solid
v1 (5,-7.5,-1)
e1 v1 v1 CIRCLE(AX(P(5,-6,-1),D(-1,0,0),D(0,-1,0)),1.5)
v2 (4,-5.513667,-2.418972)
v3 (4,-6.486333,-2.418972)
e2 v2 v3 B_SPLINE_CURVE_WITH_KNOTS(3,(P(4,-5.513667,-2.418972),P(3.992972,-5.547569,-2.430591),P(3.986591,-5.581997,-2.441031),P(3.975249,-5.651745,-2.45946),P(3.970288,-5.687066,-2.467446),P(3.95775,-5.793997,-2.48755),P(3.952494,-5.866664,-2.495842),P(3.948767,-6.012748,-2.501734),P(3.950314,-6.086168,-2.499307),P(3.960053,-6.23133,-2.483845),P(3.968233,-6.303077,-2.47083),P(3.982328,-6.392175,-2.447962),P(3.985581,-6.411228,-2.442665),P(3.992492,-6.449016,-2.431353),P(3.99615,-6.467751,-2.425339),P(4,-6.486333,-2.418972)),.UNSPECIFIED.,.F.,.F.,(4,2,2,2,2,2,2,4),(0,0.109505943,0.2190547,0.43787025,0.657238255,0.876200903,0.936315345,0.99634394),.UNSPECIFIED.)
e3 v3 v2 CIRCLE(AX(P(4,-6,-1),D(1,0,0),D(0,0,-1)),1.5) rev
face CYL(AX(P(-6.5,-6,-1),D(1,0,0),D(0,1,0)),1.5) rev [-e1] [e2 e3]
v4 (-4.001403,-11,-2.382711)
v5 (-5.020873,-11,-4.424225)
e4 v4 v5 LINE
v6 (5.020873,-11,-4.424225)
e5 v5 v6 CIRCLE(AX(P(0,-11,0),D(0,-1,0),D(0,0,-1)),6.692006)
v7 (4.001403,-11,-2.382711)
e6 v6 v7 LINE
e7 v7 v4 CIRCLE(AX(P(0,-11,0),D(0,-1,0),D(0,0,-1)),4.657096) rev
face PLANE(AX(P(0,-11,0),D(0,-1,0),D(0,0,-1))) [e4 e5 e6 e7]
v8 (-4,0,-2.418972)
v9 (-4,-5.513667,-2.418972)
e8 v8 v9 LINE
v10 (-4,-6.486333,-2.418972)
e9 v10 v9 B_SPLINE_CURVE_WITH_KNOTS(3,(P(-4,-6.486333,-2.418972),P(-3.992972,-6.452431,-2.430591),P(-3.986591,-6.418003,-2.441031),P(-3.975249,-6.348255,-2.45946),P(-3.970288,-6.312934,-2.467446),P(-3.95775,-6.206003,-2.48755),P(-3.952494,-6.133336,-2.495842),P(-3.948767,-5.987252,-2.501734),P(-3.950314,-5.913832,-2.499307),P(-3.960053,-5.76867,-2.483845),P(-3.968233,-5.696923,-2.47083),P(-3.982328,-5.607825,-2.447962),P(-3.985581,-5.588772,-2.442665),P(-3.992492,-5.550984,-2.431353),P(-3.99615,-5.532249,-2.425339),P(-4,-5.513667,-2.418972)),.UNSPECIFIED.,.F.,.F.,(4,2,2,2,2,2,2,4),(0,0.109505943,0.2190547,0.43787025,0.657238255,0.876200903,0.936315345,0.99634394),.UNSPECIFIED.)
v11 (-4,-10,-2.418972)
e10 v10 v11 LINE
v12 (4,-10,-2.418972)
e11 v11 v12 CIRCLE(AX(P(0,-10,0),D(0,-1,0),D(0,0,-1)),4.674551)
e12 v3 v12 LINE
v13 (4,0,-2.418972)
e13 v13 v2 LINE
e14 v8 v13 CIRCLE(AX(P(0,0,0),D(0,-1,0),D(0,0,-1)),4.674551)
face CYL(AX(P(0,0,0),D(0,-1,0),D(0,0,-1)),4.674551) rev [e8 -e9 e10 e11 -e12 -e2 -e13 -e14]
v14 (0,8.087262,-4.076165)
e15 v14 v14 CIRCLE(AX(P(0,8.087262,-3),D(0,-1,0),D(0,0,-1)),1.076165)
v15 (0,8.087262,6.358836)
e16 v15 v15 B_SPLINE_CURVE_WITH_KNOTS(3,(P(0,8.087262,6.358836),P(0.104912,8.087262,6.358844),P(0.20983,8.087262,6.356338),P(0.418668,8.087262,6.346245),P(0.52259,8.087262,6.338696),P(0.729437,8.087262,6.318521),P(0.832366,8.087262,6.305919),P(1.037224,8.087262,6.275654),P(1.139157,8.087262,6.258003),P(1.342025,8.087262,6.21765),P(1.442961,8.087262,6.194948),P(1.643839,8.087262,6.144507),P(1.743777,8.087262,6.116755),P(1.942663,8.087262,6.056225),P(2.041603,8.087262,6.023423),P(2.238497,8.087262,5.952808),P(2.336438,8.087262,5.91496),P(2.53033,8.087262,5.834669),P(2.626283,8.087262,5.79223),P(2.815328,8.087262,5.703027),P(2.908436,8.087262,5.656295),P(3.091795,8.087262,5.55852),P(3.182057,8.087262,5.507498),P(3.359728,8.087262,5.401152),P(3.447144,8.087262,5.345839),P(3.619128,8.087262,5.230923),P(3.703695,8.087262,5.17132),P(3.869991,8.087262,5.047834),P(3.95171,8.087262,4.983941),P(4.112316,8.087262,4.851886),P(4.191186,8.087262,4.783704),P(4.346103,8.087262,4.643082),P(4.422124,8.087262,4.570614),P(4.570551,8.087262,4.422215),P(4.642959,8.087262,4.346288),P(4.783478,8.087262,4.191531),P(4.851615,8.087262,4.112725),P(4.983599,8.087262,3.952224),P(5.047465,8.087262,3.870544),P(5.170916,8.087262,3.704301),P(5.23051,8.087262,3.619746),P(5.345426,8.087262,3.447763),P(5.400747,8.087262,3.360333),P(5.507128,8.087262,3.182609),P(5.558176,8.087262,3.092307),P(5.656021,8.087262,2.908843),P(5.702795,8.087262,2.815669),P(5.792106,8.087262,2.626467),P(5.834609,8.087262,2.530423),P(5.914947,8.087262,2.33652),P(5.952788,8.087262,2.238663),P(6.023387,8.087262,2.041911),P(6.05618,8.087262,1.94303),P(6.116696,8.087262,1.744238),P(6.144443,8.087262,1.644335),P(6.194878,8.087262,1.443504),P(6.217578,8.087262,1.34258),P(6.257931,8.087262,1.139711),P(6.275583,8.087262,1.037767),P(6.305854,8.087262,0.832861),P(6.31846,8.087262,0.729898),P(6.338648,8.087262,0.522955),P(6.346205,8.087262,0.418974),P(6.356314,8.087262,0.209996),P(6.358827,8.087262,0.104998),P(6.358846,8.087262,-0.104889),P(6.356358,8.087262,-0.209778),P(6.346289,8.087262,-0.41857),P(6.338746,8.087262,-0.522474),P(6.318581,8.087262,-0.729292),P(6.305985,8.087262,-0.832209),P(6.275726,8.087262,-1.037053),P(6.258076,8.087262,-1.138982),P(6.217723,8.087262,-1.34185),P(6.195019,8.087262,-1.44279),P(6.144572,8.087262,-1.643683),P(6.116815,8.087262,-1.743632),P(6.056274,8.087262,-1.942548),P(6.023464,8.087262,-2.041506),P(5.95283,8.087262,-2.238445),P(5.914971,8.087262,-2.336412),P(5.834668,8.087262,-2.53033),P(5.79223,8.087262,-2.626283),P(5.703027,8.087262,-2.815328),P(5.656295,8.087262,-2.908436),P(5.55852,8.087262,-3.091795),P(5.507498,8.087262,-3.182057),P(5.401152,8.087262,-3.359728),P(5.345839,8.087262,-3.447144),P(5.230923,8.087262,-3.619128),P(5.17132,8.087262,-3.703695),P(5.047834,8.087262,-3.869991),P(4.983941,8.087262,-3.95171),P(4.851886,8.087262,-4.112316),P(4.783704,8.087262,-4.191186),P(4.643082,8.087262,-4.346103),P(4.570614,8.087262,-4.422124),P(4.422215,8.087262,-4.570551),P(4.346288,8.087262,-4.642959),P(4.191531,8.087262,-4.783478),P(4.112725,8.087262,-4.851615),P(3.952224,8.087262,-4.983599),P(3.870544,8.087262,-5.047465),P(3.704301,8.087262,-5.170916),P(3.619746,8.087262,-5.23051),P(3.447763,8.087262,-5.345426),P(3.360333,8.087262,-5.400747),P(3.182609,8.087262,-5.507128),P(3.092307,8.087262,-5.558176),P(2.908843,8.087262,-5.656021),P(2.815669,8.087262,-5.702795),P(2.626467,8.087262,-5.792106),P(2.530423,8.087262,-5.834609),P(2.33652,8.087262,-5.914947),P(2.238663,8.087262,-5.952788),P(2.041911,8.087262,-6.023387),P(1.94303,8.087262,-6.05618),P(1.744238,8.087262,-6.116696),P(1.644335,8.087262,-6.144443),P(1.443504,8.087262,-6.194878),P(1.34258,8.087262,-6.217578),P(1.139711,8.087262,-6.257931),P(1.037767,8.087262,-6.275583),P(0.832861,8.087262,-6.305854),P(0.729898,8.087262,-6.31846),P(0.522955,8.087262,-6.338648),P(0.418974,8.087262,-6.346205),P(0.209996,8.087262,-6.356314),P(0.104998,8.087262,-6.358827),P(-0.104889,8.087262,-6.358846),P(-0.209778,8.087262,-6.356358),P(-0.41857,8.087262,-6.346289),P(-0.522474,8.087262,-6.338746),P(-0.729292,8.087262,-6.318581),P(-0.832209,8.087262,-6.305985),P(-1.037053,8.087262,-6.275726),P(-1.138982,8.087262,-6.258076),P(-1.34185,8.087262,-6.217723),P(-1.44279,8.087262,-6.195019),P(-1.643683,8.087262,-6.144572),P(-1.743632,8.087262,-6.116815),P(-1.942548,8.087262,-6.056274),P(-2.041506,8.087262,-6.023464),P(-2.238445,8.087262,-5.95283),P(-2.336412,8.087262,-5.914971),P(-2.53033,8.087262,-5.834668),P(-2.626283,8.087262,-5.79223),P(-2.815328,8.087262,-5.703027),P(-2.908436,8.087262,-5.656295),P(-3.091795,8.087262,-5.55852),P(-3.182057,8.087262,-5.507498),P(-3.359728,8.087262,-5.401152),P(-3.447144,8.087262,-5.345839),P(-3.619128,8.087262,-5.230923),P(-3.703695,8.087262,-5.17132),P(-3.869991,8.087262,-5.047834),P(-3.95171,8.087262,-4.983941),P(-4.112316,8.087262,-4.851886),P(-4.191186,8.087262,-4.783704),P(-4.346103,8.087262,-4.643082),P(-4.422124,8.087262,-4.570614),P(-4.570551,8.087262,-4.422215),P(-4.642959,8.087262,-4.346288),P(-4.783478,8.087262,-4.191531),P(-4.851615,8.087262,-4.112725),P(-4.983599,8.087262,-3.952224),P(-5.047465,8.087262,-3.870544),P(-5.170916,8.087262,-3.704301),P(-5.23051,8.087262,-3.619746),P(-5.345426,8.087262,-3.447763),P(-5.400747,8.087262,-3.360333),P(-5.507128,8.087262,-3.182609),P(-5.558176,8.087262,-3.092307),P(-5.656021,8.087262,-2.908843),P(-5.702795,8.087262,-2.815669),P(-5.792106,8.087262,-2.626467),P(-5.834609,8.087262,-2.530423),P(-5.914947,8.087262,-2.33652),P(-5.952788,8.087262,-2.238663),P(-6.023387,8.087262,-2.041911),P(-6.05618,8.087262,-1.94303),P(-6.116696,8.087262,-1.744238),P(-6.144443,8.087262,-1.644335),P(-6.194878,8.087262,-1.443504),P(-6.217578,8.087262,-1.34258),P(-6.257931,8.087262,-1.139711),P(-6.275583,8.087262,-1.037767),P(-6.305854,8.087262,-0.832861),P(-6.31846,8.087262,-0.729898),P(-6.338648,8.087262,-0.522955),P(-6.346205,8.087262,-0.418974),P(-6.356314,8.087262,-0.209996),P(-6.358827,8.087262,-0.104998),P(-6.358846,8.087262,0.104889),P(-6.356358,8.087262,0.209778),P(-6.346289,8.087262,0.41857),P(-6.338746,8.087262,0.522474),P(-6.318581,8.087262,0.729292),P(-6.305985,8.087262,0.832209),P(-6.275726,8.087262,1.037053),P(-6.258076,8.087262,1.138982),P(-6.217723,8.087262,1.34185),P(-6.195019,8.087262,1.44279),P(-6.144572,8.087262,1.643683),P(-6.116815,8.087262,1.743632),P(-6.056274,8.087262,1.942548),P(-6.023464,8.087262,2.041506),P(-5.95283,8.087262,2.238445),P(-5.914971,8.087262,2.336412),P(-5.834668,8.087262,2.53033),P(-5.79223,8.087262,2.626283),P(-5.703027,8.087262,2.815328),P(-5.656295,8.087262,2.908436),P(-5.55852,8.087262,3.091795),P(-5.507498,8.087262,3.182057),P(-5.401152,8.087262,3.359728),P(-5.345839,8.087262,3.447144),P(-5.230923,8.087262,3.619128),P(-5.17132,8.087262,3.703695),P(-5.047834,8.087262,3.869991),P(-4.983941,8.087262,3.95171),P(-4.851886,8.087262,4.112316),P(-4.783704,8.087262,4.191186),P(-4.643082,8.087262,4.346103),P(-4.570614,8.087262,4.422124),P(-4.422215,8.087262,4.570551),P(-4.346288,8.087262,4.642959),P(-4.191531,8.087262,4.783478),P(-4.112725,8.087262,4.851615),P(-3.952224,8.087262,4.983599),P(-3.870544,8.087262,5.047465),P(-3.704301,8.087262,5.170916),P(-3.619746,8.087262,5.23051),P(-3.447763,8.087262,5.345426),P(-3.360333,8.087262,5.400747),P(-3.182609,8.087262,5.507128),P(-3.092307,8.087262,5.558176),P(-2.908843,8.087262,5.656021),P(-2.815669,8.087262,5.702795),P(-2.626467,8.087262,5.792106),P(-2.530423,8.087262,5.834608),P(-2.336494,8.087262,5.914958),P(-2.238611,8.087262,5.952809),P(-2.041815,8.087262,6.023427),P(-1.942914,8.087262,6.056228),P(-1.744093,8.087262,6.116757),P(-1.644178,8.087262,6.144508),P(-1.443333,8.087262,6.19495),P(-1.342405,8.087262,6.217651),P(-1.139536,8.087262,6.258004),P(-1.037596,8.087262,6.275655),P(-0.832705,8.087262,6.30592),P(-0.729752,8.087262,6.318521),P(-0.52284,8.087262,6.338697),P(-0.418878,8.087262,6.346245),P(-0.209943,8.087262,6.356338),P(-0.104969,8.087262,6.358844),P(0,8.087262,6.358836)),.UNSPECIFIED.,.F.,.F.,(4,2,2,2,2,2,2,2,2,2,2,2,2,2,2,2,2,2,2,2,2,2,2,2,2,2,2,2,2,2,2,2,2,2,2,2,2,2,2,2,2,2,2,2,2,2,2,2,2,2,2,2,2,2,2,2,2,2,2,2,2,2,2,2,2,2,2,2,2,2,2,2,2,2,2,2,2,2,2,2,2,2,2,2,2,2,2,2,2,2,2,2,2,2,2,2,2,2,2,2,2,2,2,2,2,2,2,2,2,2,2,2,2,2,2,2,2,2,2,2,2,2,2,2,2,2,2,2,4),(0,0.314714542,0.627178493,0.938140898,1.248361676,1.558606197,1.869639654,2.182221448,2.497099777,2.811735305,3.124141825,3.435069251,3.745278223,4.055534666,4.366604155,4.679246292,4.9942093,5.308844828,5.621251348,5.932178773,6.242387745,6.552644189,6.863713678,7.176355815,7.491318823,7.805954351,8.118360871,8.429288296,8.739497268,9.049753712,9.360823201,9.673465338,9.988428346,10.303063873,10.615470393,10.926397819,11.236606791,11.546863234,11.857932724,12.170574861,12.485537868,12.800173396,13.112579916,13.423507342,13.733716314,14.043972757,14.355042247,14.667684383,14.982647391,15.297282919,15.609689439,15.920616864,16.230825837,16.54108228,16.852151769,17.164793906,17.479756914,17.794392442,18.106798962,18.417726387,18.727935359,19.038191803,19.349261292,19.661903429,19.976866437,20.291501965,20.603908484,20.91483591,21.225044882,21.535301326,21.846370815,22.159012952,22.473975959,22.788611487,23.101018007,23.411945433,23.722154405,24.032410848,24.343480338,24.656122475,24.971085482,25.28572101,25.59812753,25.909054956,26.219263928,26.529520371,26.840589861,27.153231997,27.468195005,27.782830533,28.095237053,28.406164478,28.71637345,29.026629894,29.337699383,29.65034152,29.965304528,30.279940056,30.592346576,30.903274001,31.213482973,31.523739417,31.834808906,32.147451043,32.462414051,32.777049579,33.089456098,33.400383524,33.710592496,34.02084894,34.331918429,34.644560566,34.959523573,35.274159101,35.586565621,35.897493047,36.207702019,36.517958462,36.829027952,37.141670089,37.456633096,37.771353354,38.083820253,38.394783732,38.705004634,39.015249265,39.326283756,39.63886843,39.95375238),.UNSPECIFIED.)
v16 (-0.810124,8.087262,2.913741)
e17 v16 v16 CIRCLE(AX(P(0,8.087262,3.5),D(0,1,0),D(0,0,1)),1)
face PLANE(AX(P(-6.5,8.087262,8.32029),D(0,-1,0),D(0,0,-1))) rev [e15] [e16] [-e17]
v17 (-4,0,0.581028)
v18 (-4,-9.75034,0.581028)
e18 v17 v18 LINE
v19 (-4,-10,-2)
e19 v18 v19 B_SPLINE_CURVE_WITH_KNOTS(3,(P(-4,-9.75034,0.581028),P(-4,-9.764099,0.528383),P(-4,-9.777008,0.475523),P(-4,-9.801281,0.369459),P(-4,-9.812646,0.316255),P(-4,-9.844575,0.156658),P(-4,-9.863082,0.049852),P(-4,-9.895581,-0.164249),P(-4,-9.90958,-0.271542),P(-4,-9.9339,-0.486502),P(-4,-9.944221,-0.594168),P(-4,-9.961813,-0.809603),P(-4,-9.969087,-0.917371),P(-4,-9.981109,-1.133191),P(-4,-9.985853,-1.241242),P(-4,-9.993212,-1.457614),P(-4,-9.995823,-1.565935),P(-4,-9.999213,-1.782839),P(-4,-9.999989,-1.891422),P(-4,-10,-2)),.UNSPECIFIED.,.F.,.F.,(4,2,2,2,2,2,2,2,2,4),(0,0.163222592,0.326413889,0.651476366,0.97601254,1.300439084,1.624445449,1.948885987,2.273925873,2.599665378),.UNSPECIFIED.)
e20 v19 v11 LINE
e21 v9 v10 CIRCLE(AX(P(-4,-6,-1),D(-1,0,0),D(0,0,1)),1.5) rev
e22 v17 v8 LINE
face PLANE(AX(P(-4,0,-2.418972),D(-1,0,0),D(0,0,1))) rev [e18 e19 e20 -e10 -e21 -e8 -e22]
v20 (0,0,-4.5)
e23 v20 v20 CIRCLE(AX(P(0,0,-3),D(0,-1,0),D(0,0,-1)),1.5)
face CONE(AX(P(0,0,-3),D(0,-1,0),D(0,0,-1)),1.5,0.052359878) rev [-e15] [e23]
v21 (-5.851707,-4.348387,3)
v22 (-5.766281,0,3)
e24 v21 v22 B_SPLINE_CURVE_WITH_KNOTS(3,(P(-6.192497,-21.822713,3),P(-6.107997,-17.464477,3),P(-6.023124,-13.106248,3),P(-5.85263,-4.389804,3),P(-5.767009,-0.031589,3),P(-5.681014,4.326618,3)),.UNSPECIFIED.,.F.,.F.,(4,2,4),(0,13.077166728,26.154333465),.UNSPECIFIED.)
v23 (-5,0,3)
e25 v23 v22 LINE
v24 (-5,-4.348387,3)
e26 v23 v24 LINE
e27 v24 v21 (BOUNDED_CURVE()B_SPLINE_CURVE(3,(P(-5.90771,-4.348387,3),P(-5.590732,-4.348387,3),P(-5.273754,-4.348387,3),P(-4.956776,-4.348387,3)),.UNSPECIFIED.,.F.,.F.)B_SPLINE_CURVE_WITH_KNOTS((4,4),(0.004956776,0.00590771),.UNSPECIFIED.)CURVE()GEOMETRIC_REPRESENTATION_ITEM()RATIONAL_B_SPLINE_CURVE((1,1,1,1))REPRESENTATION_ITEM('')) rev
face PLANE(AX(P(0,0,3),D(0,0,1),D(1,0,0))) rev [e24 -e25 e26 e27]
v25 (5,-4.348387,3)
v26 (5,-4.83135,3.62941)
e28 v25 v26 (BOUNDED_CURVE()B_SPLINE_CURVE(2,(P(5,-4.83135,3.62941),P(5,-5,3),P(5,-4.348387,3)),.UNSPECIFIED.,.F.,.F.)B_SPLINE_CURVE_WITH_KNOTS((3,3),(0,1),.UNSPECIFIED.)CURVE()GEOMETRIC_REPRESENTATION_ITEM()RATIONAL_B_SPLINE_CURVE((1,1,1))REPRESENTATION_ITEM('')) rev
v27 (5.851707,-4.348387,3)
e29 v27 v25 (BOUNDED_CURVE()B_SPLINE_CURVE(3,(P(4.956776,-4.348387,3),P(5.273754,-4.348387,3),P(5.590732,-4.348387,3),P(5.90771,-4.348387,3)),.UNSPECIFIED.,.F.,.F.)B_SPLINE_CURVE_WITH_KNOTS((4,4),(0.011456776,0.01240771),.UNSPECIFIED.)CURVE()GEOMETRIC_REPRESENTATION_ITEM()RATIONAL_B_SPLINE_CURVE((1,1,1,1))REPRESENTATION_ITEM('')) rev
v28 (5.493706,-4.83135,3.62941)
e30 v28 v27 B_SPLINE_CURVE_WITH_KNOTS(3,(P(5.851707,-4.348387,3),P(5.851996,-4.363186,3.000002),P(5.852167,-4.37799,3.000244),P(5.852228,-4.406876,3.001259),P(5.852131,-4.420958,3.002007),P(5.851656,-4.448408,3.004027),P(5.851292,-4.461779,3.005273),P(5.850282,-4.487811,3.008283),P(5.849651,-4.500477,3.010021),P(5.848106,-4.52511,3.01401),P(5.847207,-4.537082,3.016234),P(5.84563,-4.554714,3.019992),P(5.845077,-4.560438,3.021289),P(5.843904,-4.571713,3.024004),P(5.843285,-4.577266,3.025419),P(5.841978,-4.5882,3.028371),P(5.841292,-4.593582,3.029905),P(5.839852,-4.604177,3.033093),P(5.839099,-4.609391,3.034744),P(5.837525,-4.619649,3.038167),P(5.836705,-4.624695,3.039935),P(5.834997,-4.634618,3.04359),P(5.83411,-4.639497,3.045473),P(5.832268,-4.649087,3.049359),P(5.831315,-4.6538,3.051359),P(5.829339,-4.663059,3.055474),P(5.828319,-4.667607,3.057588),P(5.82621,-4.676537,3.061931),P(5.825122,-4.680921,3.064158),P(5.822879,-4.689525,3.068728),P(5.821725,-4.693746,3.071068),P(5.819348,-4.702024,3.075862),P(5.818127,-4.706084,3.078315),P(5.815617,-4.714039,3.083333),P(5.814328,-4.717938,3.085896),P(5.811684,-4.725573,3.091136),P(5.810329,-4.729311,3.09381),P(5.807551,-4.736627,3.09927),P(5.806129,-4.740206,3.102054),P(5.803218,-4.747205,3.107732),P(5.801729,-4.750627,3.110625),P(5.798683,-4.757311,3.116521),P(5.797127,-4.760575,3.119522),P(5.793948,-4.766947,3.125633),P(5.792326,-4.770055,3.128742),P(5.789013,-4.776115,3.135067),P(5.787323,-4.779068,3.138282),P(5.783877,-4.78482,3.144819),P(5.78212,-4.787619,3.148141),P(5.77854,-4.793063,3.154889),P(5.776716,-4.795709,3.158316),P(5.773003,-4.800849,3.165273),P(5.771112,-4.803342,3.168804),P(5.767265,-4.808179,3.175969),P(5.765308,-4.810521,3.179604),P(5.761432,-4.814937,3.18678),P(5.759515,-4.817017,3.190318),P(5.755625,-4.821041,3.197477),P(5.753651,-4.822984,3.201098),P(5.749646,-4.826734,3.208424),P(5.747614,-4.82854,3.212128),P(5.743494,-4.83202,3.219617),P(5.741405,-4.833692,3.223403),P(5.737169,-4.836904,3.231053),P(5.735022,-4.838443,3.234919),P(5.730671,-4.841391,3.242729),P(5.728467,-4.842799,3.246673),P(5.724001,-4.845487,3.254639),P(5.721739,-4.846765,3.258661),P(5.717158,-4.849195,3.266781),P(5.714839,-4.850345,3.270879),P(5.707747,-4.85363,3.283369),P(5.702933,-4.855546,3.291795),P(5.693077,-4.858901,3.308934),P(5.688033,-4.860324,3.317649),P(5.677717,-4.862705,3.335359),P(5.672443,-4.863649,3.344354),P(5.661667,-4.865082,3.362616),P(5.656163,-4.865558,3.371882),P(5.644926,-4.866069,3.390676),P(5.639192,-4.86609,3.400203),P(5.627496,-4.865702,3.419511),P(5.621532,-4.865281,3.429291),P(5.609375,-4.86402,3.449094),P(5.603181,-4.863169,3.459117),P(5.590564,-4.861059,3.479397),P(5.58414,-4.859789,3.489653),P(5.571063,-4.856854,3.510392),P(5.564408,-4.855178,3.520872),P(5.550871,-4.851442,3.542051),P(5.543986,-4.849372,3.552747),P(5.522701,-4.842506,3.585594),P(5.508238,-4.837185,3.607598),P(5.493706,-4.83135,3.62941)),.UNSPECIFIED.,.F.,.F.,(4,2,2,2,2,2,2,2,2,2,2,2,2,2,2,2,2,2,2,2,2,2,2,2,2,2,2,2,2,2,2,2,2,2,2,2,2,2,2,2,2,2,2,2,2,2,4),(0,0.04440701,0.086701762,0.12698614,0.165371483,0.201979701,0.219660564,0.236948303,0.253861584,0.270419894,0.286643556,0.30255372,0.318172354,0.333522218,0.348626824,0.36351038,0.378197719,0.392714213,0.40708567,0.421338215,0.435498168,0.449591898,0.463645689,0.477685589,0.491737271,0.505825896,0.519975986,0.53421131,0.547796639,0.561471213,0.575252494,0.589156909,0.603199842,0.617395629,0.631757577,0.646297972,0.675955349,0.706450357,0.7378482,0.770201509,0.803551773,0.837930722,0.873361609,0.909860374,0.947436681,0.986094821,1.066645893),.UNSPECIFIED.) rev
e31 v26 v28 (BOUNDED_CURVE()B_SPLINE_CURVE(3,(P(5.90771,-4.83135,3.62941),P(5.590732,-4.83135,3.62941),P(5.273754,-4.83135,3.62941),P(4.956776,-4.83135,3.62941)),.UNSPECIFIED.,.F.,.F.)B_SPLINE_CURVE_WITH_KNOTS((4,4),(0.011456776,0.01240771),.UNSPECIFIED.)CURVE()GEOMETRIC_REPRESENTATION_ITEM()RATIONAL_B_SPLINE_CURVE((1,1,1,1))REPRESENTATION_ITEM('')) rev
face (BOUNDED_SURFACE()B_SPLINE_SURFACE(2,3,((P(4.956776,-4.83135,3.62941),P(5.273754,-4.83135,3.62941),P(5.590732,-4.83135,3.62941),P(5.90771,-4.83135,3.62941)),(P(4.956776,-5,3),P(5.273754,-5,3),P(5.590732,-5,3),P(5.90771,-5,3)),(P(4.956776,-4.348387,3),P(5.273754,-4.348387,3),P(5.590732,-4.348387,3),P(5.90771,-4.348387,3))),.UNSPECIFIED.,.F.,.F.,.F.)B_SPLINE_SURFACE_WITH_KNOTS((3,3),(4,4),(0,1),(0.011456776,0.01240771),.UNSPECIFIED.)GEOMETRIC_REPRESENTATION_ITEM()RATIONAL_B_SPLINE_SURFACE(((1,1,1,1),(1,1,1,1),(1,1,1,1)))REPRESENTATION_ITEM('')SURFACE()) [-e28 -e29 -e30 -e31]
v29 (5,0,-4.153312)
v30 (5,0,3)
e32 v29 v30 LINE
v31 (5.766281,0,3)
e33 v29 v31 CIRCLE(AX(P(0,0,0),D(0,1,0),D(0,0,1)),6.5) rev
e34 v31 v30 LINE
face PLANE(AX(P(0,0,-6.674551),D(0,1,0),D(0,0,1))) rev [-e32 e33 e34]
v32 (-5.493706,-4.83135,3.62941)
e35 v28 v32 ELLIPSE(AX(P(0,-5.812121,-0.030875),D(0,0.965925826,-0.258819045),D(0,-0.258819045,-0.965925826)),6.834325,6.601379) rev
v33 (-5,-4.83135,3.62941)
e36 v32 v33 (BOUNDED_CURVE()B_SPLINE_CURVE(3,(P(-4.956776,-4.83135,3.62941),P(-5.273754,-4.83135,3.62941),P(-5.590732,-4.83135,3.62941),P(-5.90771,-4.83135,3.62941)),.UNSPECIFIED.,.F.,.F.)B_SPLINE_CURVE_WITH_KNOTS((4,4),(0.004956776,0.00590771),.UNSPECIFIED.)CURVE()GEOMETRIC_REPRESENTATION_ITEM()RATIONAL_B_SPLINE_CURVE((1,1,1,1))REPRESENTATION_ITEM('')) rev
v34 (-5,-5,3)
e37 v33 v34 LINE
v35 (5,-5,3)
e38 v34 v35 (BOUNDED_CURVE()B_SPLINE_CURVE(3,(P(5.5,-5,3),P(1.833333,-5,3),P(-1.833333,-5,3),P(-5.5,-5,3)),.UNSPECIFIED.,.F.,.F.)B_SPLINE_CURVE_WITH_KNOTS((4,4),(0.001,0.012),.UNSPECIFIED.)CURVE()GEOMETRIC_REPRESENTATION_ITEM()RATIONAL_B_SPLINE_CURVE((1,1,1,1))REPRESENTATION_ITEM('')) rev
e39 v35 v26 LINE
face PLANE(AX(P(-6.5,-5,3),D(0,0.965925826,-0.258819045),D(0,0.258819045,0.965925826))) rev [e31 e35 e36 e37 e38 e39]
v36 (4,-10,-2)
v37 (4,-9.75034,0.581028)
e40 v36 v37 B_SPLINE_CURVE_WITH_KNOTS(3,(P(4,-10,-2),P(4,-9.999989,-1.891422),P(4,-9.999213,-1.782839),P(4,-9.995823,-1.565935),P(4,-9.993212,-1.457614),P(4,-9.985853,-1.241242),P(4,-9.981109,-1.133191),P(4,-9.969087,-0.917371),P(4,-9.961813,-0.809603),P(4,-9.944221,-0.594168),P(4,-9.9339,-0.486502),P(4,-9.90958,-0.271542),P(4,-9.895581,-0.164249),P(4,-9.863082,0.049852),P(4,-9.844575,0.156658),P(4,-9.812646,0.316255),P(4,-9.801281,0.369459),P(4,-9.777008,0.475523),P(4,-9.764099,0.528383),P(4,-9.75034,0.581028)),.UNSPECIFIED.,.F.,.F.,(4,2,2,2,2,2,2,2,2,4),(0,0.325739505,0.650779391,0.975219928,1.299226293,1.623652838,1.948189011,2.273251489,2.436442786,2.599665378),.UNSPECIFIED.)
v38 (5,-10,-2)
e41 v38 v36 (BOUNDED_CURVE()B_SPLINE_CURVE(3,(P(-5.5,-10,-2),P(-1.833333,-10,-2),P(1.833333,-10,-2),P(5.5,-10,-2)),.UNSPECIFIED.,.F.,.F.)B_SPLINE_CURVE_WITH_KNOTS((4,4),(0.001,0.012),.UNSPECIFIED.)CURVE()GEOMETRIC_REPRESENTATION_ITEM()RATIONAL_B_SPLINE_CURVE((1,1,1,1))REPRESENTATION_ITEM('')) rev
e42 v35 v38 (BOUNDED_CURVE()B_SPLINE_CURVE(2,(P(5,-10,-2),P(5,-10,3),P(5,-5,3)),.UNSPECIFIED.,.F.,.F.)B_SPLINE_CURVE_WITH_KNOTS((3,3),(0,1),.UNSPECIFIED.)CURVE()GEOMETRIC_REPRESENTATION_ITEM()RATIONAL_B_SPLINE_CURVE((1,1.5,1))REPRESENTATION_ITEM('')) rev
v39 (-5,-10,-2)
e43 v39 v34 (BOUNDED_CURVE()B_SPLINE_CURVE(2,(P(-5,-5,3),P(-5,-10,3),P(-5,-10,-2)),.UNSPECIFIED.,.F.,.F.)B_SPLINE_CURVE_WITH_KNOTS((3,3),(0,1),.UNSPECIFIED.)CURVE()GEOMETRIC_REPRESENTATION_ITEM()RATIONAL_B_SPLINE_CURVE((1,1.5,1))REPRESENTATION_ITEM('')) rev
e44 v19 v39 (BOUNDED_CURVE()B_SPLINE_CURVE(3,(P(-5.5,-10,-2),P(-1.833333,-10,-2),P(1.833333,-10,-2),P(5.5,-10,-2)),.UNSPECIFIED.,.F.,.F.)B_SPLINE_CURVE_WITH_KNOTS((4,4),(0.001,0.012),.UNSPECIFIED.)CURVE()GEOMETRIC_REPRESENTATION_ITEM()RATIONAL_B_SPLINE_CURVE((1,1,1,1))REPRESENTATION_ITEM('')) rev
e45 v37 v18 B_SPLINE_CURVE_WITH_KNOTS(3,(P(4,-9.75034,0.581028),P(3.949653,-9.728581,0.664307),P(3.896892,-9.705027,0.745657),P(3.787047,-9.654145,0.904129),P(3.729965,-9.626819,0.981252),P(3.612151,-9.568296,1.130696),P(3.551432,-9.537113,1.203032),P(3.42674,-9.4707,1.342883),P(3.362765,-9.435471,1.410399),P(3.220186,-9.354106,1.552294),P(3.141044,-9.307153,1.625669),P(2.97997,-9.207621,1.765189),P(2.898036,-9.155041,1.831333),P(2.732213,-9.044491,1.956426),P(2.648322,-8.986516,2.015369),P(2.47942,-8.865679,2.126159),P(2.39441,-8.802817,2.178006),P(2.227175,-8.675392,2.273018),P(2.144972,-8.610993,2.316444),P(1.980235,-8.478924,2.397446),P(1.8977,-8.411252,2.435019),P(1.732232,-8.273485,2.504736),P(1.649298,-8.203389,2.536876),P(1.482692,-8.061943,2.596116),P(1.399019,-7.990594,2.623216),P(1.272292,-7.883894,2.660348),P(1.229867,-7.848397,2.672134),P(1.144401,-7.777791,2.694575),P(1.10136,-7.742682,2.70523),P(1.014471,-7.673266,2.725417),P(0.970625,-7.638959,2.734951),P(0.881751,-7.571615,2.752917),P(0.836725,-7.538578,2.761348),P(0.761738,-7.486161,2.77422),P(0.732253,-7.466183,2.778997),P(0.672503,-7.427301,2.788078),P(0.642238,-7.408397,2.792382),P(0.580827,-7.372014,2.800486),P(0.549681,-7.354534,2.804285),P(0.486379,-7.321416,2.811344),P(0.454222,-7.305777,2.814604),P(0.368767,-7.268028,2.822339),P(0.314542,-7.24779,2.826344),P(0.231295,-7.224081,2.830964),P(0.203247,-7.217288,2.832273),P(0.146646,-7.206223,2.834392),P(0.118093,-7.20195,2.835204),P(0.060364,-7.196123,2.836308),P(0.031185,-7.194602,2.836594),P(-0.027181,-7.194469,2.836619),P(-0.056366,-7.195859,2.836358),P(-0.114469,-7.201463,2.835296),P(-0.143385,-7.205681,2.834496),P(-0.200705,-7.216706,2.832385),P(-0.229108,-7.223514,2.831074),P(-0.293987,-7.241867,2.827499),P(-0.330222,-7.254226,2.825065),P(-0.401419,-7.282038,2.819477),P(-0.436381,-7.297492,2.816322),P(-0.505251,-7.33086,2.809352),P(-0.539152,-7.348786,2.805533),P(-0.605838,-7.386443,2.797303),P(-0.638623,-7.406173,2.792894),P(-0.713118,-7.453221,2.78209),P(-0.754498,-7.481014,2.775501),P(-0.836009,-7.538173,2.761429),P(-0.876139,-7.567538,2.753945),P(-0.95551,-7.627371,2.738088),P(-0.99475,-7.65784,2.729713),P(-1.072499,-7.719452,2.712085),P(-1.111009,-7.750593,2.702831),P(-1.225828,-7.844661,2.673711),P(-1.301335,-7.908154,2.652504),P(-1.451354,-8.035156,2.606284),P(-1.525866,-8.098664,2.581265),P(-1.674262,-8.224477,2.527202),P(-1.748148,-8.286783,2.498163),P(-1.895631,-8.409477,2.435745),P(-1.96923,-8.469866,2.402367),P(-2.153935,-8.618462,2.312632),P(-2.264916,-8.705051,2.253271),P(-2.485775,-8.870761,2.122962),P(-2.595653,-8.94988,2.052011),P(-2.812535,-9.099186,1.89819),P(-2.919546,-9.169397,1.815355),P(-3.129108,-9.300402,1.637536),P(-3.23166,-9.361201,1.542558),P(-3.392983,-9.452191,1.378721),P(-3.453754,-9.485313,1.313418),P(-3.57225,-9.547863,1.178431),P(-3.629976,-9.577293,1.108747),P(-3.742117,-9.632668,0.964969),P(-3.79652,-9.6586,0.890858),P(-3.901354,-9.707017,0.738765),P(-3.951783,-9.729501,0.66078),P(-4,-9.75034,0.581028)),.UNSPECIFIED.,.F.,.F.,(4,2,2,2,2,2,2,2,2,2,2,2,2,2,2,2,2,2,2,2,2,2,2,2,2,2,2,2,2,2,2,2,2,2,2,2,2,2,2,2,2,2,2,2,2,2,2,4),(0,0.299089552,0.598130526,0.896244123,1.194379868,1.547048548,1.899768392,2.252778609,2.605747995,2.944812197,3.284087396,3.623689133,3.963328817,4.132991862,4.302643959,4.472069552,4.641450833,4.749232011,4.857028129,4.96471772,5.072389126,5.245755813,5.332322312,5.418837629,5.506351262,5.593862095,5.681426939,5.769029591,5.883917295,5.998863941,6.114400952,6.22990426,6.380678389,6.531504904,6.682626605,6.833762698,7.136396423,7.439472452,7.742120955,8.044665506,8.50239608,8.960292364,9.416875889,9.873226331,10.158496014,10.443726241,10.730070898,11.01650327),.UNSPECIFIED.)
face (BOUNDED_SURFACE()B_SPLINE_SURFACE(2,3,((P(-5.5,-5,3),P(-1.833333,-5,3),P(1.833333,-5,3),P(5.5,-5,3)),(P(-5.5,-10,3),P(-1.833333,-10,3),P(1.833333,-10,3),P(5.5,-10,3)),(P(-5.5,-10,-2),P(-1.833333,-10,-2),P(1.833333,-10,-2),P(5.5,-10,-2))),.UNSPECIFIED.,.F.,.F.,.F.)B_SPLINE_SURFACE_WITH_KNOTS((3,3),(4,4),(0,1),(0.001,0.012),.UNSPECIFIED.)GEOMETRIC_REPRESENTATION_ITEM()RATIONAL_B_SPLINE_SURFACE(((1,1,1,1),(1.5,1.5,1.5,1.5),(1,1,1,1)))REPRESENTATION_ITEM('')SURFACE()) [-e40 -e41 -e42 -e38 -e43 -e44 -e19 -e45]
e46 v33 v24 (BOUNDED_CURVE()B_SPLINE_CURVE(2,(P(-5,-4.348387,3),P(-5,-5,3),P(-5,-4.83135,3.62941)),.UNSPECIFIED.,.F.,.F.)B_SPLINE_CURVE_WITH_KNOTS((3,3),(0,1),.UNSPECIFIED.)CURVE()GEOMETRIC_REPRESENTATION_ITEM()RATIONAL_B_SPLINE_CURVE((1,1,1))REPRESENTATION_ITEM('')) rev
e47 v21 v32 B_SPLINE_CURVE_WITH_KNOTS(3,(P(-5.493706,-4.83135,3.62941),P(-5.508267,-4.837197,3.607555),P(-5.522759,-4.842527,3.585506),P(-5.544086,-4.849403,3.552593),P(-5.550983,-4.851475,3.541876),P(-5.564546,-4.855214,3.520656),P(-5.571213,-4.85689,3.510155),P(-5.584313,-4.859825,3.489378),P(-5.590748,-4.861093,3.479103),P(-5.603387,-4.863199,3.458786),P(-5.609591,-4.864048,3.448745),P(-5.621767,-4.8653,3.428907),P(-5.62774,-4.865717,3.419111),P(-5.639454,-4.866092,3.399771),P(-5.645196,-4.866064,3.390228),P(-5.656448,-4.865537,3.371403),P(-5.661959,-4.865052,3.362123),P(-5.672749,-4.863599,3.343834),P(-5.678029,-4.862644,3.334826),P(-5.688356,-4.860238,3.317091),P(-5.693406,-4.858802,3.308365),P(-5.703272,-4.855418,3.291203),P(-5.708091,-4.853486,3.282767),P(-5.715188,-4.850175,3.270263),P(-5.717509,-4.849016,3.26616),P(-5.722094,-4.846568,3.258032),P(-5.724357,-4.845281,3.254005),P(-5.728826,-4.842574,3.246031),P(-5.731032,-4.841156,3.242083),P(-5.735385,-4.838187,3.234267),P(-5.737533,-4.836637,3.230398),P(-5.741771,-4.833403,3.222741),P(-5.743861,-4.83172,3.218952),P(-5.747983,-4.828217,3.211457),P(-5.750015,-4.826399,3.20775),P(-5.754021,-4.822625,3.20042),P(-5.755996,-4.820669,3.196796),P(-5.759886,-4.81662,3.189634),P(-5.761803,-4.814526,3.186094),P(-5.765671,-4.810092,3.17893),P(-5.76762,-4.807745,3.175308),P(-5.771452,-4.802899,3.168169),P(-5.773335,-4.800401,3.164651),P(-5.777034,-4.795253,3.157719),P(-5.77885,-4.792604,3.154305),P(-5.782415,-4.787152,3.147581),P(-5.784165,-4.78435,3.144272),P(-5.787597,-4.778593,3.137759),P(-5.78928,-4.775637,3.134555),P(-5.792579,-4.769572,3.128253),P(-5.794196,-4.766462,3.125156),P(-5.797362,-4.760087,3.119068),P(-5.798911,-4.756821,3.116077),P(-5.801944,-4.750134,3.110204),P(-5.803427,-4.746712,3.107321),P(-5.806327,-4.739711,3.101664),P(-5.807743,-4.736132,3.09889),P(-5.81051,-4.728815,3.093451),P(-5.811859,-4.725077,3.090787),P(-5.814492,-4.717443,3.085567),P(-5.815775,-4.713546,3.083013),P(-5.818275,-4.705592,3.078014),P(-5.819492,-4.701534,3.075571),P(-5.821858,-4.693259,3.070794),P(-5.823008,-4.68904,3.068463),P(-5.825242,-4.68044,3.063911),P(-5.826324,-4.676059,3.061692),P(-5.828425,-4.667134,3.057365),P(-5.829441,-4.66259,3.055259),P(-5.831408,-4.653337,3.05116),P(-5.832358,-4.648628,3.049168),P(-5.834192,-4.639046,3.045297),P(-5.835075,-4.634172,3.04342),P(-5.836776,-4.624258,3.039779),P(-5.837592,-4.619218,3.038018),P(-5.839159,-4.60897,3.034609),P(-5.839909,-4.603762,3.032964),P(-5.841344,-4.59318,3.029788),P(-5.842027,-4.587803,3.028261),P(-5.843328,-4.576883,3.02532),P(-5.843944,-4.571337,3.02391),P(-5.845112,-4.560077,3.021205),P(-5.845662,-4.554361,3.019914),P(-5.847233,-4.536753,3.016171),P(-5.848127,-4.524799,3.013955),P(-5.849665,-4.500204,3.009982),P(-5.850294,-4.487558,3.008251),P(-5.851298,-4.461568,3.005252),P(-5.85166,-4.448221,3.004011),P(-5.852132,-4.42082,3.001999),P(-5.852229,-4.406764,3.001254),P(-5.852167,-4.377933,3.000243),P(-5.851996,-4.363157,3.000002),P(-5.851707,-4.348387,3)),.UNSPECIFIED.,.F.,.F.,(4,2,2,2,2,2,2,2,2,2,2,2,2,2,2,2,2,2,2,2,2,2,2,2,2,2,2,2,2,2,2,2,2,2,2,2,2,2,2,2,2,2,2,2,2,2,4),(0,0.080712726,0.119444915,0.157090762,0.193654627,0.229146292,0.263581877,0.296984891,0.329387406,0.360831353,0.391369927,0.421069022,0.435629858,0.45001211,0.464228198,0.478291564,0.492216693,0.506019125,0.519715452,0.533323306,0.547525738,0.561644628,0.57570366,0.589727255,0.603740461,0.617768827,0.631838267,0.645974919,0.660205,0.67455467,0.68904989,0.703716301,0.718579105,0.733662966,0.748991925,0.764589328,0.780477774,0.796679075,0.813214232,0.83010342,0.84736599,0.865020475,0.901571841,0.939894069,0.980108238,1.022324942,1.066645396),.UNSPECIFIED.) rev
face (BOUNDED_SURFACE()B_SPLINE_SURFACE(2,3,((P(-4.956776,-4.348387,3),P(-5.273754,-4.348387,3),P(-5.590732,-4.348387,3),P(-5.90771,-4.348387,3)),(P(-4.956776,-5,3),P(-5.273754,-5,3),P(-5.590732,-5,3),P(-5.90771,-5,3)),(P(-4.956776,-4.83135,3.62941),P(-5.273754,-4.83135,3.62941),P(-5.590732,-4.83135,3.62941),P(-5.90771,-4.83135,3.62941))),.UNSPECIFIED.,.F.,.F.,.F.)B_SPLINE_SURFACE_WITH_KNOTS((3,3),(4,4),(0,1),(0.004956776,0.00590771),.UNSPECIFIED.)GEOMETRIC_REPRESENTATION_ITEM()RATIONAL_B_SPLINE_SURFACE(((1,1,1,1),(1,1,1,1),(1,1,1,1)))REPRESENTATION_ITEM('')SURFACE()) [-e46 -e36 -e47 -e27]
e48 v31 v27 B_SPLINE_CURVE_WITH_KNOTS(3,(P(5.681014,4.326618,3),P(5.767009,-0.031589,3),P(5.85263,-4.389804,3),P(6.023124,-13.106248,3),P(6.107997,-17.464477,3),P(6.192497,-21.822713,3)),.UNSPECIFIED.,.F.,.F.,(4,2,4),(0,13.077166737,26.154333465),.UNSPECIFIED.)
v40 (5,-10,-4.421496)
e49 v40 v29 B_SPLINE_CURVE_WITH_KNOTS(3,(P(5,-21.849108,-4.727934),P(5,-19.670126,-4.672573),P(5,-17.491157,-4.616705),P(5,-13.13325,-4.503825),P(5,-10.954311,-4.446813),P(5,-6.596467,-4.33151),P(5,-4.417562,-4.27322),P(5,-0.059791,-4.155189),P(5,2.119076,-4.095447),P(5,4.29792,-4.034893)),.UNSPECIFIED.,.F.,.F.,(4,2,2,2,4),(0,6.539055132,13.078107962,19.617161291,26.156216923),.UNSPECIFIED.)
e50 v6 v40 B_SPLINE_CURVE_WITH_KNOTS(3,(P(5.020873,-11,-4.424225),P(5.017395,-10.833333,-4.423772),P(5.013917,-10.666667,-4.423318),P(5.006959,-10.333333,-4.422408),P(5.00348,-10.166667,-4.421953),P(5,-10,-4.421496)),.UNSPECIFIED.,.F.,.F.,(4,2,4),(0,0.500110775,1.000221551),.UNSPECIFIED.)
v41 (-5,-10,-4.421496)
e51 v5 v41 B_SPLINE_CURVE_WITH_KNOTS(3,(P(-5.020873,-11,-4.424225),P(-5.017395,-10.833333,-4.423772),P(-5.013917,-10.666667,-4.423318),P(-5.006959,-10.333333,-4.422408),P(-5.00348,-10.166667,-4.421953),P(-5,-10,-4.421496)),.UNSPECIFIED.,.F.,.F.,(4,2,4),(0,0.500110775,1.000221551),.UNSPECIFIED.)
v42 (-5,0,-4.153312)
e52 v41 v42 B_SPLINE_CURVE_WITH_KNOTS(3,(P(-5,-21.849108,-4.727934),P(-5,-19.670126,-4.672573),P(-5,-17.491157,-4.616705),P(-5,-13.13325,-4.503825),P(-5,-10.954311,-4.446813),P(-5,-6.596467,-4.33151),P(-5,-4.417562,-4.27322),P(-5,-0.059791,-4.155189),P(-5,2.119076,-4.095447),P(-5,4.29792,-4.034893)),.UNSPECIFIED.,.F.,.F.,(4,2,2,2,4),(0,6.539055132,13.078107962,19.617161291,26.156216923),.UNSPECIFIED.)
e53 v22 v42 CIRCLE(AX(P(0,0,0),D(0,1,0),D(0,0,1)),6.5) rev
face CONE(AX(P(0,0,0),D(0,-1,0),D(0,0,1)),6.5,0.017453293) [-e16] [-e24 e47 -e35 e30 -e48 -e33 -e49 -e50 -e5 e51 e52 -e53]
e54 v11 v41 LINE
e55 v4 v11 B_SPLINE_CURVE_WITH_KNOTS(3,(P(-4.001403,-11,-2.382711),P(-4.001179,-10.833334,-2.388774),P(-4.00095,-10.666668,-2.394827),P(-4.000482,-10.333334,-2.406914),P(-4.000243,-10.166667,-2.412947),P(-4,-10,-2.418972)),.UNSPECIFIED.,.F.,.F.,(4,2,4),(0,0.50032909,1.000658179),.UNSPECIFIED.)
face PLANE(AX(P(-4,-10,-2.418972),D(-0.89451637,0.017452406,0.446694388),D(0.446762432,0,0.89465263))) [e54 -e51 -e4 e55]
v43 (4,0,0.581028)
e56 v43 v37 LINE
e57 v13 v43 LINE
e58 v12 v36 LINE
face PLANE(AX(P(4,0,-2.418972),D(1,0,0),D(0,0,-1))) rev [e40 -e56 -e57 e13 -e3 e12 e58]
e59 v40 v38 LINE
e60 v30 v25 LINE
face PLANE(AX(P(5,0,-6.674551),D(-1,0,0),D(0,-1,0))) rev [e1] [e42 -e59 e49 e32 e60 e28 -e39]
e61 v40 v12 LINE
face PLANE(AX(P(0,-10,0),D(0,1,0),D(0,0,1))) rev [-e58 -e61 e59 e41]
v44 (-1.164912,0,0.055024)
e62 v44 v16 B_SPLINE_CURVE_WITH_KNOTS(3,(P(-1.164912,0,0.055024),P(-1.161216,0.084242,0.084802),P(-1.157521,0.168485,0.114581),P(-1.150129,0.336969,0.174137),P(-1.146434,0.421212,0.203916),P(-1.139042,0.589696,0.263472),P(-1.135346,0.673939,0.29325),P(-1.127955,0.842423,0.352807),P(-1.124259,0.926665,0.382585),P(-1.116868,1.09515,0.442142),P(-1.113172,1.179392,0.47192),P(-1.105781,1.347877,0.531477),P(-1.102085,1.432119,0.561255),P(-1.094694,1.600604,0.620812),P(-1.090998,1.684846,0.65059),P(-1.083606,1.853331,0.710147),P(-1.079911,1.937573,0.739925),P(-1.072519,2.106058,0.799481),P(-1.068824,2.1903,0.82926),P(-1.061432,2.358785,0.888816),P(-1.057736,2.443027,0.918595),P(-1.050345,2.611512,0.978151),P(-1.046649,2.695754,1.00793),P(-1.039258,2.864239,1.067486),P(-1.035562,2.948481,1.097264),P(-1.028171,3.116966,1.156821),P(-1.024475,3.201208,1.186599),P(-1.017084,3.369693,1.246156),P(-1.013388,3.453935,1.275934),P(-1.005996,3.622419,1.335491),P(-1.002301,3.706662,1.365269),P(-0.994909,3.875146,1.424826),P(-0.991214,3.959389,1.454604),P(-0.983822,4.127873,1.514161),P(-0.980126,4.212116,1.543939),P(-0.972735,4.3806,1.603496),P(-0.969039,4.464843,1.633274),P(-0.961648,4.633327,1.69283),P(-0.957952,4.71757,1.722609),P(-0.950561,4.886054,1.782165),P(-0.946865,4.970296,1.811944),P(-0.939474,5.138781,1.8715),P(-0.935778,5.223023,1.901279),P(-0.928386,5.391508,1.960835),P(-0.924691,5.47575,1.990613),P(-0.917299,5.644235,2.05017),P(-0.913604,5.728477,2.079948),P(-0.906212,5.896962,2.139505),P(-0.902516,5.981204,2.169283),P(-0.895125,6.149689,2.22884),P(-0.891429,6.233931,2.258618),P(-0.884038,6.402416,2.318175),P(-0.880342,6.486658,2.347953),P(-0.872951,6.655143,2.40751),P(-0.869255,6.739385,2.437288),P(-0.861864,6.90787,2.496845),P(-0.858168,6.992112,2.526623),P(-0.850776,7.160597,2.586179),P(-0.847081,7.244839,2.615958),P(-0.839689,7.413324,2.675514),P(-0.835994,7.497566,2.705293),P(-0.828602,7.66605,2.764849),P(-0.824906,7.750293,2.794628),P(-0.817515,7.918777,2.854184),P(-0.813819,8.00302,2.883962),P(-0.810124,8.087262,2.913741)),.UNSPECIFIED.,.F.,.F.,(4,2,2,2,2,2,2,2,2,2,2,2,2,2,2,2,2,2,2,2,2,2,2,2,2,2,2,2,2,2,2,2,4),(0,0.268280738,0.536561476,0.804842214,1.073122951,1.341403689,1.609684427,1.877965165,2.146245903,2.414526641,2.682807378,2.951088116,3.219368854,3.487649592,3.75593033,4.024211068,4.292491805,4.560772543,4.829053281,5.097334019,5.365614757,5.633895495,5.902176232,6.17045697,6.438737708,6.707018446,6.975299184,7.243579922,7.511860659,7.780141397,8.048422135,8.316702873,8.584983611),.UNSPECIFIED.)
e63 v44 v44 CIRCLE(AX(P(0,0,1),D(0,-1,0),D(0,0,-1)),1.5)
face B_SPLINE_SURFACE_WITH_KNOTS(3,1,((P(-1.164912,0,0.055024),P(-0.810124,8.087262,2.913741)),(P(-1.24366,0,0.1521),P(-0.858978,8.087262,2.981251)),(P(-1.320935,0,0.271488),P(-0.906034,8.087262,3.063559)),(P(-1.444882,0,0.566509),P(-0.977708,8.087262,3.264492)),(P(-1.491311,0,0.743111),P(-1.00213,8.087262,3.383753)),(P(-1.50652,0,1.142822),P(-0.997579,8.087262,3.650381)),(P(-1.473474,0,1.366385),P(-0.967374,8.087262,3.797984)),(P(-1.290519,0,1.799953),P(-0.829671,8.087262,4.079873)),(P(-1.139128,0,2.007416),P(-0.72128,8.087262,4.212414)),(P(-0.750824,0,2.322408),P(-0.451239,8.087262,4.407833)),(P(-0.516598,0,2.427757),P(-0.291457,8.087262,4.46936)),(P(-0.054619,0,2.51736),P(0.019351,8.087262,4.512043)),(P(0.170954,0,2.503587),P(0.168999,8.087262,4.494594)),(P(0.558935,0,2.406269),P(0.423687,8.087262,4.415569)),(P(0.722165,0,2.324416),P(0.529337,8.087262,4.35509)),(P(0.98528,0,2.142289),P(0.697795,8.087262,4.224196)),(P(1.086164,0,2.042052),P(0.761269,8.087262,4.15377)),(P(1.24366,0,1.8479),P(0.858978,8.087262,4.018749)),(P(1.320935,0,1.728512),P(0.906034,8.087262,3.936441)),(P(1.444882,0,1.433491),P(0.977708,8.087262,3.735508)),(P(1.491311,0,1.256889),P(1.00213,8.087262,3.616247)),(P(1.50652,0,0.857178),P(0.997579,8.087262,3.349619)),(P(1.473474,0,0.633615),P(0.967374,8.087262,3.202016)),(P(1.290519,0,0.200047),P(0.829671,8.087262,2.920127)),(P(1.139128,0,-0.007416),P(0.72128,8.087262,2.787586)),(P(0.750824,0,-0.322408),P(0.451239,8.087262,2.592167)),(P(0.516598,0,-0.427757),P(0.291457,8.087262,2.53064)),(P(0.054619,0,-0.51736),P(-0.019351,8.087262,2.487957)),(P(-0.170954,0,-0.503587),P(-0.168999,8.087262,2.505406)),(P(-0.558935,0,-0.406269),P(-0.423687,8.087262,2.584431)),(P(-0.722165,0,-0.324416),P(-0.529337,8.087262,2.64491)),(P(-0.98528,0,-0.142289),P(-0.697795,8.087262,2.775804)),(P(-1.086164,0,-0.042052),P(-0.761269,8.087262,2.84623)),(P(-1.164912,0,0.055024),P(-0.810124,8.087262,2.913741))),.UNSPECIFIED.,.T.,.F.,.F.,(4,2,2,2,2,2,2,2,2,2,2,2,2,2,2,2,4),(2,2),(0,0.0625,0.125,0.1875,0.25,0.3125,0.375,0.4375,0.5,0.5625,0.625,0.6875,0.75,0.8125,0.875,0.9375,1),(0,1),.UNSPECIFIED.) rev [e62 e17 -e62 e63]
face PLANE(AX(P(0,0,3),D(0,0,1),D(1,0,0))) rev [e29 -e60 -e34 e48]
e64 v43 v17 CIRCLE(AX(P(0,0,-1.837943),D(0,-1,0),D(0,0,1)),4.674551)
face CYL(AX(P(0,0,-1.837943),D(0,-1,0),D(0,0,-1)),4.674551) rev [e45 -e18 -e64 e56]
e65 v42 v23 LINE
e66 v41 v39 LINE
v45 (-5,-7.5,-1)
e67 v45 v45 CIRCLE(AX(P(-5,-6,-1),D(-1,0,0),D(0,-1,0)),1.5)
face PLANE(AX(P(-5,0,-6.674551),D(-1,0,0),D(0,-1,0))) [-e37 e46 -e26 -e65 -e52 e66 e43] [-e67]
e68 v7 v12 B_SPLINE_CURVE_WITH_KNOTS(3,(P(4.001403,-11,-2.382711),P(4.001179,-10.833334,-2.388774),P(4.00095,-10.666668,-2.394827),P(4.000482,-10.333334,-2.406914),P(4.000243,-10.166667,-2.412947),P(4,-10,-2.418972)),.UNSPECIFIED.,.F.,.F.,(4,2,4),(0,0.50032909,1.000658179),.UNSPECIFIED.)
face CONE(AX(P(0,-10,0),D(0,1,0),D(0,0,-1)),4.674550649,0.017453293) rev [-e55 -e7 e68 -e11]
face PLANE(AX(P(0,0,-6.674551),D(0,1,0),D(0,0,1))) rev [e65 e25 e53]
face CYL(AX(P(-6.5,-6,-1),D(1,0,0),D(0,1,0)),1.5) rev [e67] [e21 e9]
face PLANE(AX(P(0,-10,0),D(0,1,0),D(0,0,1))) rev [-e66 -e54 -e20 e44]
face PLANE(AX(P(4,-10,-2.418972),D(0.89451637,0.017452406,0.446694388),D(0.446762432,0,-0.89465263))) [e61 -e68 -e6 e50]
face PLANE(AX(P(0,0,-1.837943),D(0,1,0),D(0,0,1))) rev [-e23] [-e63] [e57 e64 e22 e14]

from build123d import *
from build123d.topology import SkipClean

# Parameters (mm, degrees)
SKETCH1_R                     = 6.5
BOSS_EXTRUDE1_DEPTH           = 18
BOSS_EXTRUDE1_TAPER           = 1
BOSS_EXTRUDE1_OTHER_WAY_DEPTH = 10
BOSS_EXTRUDE1_OTHER_WAY_TAPER = -1
SKETCH2_W                     = 5.545055897
SKETCH2_H                     = 10
CUT_EXTRUDE1_DEPTH            = 22.497594206
CUT_EXTRUDE2_DEPTH            = 23.378552983
CUT_EXTRUDE2_DEPTH_BACK       = 23.378552983
CUT_EXTRUDE3_DEPTH            = 23.378552983
CUT_EXTRUDE3_DEPTH_BACK       = 23.378552983
SKETCH4_R                     = 1.5
FILLET1_SIZE                  = 5
CUT_EXTRUDE4_DEPTH            = 21.268192633
CUT_EXTRUDE4_DEPTH_BACK       = 21.268192633
SKETCH5_W                     = 18.469746175
SKETCH5_H                     = 12.695602453
CUT_EXTRUDE5_DEPTH            = 10
BOSS_EXTRUDE3_DEPTH           = 1
BOSS_EXTRUDE3_DRAFT           = -1
SKETCH11_R                    = 1.5
CUT_EXTRUDE7_DEPTH            = 15.423347107
CUT_EXTRUDE7_DRAFT            = -3
SKETCH12_R                    = 1.5
SKETCH13_R                    = 1


with BuildPart() as part:
    # Sketch1 → Boss-Extrude1 (new body)
    with BuildSketch(Plane(origin=(0, 0, 0), x_dir=(1, 0, 0), z_dir=(0, 1, 0))):
        Circle(SKETCH1_R)
    extrude(amount=BOSS_EXTRUDE1_DEPTH, taper=BOSS_EXTRUDE1_TAPER)

    # Sketch1 → Boss-Extrude1 other way (add)
    with BuildSketch(Plane(origin=(0, 0, 0), x_dir=(1, 0, 0), z_dir=(0, 1, 0))):
        Circle(SKETCH1_R)
    extrude(amount=-BOSS_EXTRUDE1_OTHER_WAY_DEPTH, taper=BOSS_EXTRUDE1_OTHER_WAY_TAPER)

    # Sketch2 → Cut-Extrude1 (cut, through all)
    with BuildSketch(Plane.XY.offset(3)):
        with Locations((-7.772527949, -5)):
            Rectangle(SKETCH2_W, SKETCH2_H)
        with Locations((7.772527949, -5)):
            Rectangle(SKETCH2_W, SKETCH2_H)
    extrude(amount=-CUT_EXTRUDE1_DEPTH, mode=Mode.SUBTRACT)

    # Sketch3 → Cut-Extrude2 (cut, two sides: drawn at the far end of the back side and taken through both)
    with BuildSketch(Plane(origin=(5, 0, 0), x_dir=(0, 0, -1), z_dir=(1, 0, 0)).offset(-CUT_EXTRUDE2_DEPTH_BACK)):
        Polygon((-3, -10), (-3, -5), (-18.921941618, -0.733728602), (-18.921941618, -10), align=None)
    extrude(amount=CUT_EXTRUDE2_DEPTH + CUT_EXTRUDE2_DEPTH_BACK, mode=Mode.SUBTRACT)

    # Sketch4 → Cut-Extrude3 (cut, two sides: drawn at the far end of the back side and taken through both)
    with BuildSketch(Plane(origin=(5, 0, 0), x_dir=(0, 0, -1), z_dir=(1, 0, 0)).offset(-CUT_EXTRUDE3_DEPTH_BACK)):
        with Locations(Location((1, -6, 0), (0, 0, 270))):
            Circle(SKETCH4_R)
    extrude(amount=CUT_EXTRUDE3_DEPTH + CUT_EXTRUDE3_DEPTH_BACK, mode=Mode.SUBTRACT)

    # Fillet1
    # a fillet whose section is not a circle: 5 mm, written as the material it takes off along each edge
    with BuildSketch(Plane(origin=(17.5, -10, 3), x_dir=(0, 0, -1), z_dir=(-1, 0, 0))) as fillet1_piece_1:
        with BuildLine():
            Bezier((FILLET1_SIZE, 0), (0, 0), (0, -FILLET1_SIZE), weights=[1, 1.5, 1])
            Line((0, -FILLET1_SIZE), (0, 0))
            Line((0, 0), (FILLET1_SIZE, 0))
        make_face()
    extrude(amount=35, mode=Mode.SUBTRACT)

    # Fillet2
    # a fillet whose section is not a circle: 10, 5 mm, written as the material it takes off along each edge
    with BuildSketch(Plane(origin=(0, 18, 0), x_dir=(1, 0, 0), z_dir=(0, 0, -1))) as fillet2_piece_1:
        with BuildLine():
            Bezier((6.358836316, 9.912737968), (6.185808831, 0), (1.35959784, 0), weights=[1, 0.818181818, 1])
            Line((1.35959784, 0), (6.185808831, 0))
            Line((6.185808831, 0), (6.358836316, 9.912737968))
        make_face()
    revolve(axis=Axis((0, 18, 0), (0, -1, 0)), mode=Mode.SUBTRACT)

    # Sketch5 → Cut-Extrude4 (cut, two sides: drawn at the far end of the back side and taken through both)
    with BuildSketch(Plane(origin=(0, 0, 0), x_dir=(0, 0, -1), z_dir=(1, 0, 0)).offset(-CUT_EXTRUDE4_DEPTH_BACK)):
        with Locations((0.914582981, 14.435063259)):
            Rectangle(SKETCH5_W, SKETCH5_H)
    extrude(amount=CUT_EXTRUDE4_DEPTH + CUT_EXTRUDE4_DEPTH_BACK, mode=Mode.SUBTRACT)

    # Sketch6 → Cut-Extrude5 (cut)
    with BuildSketch(Plane.XZ.offset(10)):
        with BuildLine():
            Line((-4, -2.418971635), (-4, 0.581028365))
            ThreePointArc((-4, 0.581028365), (0, 2.836607379), (4, 0.581028365))
            Line((4, 0.581028365), (4, -2.418971635))
            ThreePointArc((4, -2.418971635), (0, -4.674550649), (-4, -2.418971635))
        make_face()
    extrude(amount=-CUT_EXTRUDE5_DEPTH, mode=Mode.SUBTRACT)

    # Fillet3
    # a fillet whose section is not a circle: 0.5 mm, written as the material it takes off along each edge
    with BuildSketch(Plane(origin=(5, -5, 3), x_dir=(0, 1, 0), z_dir=(1, 0, 0))) as fillet3_piece_1:
        with BuildLine():
            Bezier((0.651612686, 0), (0, 0), (0.168649773, 0.629409523), weights=[1, 1, 1])
            Line((0.168649773, 0.629409523), (0, 0))
            Line((0, 0), (0.651612686, 0))
        make_face()
    extrude(amount=2.493517729, mode=Mode.SUBTRACT)
    with BuildSketch(Plane(origin=(-7.493517729, -5, 3), x_dir=(0, 0.258819045102518, 0.9659258262890691), z_dir=(1, 0, 0))) as fillet3_piece_2:
        with BuildLine():
            Bezier((0.651612686, 0), (0, 0), (0.168649773, -0.629409523), weights=[1, 1, 1])
            Line((0.168649773, -0.629409523), (0, 0))
            Line((0, 0), (0.651612686, 0))
        make_face()
    extrude(amount=2.493517729, mode=Mode.SUBTRACT)


with BuildPart() as boss_extrude3_tool:
    # Sketch9 → Boss-Extrude3 (with draft: the straight prism first)
    with BuildSketch(Plane.XZ.offset(10)):
        with BuildLine():
            Line((-4, -2.418971635), (-5, -4.421495943))
            ThreePointArc((-5, -4.421495943), (0, -6.674550649), (5, -4.421495943))
            Line((5, -4.421495943), (4, -2.418971635))
            ThreePointArc((4, -2.418971635), (0, -4.674550649), (-4, -2.418971635))
        make_face()
    extrude(amount=BOSS_EXTRUDE3_DEPTH)
    # Boss-Extrude3: the draft: its side faces are tilted about the plane it starts from
    boss_extrude3_sides = [boss_extrude3_tool.faces().sort_by_distance(p)[0] for p in [
        (0, -10.5, -6.674550649),
        (4.5, -10.5, -3.420233789),
        (0, -10.5, -4.674550649),
        (-4.5, -10.5, -3.420233789),
    ]]
    draft(boss_extrude3_sides, Plane.XZ.offset(10), BOSS_EXTRUDE3_DRAFT)


with BuildPart() as part_1:
    add(part.part)

    # Boss-Extrude3: add boss_extrude3_tool
    add(boss_extrude3_tool.part)


with BuildPart() as cut_extrude7_tool:
    # Sketch11 → Cut-Extrude7 (with draft: the straight prism first)
    with BuildSketch(Plane.XZ):
        with Locations((0, -3)):
            Circle(SKETCH11_R)
    extrude(amount=-CUT_EXTRUDE7_DEPTH)
    # Cut-Extrude7: the draft: its side faces are tilted about the plane it starts from
    cut_extrude7_sides = [cut_extrude7_tool.faces().sort_by_distance(p)[0] for p in [
        (-1.5, 7.711673554, -3),
    ]]
    draft(cut_extrude7_sides, Plane.XZ, CUT_EXTRUDE7_DRAFT)


with BuildPart() as part_2:
    add(part_1.part)

    # Cut-Extrude7: cut by cut_extrude7_tool
    add(cut_extrude7_tool.part, mode=Mode.SUBTRACT)

    # Sketch12 → Cut-Loft1 section 0
    with SkipClean():  # the faces are left unmerged after this step: merging them gives an invalid solid
        with BuildSketch(Plane.XZ):
            with Locations((0, 1)):
                Circle(SKETCH12_R)
        # Sketch13 → Cut-Loft1 section 1
        with BuildSketch(Plane(origin=(0, 8.087262032, 0), x_dir=(1, 0, 0), z_dir=(0, 1, 0))):
            with Locations((0, -3.5)):
                Circle(SKETCH13_R)
        loft(mode=Mode.SUBTRACT)


solid = part_2.part
